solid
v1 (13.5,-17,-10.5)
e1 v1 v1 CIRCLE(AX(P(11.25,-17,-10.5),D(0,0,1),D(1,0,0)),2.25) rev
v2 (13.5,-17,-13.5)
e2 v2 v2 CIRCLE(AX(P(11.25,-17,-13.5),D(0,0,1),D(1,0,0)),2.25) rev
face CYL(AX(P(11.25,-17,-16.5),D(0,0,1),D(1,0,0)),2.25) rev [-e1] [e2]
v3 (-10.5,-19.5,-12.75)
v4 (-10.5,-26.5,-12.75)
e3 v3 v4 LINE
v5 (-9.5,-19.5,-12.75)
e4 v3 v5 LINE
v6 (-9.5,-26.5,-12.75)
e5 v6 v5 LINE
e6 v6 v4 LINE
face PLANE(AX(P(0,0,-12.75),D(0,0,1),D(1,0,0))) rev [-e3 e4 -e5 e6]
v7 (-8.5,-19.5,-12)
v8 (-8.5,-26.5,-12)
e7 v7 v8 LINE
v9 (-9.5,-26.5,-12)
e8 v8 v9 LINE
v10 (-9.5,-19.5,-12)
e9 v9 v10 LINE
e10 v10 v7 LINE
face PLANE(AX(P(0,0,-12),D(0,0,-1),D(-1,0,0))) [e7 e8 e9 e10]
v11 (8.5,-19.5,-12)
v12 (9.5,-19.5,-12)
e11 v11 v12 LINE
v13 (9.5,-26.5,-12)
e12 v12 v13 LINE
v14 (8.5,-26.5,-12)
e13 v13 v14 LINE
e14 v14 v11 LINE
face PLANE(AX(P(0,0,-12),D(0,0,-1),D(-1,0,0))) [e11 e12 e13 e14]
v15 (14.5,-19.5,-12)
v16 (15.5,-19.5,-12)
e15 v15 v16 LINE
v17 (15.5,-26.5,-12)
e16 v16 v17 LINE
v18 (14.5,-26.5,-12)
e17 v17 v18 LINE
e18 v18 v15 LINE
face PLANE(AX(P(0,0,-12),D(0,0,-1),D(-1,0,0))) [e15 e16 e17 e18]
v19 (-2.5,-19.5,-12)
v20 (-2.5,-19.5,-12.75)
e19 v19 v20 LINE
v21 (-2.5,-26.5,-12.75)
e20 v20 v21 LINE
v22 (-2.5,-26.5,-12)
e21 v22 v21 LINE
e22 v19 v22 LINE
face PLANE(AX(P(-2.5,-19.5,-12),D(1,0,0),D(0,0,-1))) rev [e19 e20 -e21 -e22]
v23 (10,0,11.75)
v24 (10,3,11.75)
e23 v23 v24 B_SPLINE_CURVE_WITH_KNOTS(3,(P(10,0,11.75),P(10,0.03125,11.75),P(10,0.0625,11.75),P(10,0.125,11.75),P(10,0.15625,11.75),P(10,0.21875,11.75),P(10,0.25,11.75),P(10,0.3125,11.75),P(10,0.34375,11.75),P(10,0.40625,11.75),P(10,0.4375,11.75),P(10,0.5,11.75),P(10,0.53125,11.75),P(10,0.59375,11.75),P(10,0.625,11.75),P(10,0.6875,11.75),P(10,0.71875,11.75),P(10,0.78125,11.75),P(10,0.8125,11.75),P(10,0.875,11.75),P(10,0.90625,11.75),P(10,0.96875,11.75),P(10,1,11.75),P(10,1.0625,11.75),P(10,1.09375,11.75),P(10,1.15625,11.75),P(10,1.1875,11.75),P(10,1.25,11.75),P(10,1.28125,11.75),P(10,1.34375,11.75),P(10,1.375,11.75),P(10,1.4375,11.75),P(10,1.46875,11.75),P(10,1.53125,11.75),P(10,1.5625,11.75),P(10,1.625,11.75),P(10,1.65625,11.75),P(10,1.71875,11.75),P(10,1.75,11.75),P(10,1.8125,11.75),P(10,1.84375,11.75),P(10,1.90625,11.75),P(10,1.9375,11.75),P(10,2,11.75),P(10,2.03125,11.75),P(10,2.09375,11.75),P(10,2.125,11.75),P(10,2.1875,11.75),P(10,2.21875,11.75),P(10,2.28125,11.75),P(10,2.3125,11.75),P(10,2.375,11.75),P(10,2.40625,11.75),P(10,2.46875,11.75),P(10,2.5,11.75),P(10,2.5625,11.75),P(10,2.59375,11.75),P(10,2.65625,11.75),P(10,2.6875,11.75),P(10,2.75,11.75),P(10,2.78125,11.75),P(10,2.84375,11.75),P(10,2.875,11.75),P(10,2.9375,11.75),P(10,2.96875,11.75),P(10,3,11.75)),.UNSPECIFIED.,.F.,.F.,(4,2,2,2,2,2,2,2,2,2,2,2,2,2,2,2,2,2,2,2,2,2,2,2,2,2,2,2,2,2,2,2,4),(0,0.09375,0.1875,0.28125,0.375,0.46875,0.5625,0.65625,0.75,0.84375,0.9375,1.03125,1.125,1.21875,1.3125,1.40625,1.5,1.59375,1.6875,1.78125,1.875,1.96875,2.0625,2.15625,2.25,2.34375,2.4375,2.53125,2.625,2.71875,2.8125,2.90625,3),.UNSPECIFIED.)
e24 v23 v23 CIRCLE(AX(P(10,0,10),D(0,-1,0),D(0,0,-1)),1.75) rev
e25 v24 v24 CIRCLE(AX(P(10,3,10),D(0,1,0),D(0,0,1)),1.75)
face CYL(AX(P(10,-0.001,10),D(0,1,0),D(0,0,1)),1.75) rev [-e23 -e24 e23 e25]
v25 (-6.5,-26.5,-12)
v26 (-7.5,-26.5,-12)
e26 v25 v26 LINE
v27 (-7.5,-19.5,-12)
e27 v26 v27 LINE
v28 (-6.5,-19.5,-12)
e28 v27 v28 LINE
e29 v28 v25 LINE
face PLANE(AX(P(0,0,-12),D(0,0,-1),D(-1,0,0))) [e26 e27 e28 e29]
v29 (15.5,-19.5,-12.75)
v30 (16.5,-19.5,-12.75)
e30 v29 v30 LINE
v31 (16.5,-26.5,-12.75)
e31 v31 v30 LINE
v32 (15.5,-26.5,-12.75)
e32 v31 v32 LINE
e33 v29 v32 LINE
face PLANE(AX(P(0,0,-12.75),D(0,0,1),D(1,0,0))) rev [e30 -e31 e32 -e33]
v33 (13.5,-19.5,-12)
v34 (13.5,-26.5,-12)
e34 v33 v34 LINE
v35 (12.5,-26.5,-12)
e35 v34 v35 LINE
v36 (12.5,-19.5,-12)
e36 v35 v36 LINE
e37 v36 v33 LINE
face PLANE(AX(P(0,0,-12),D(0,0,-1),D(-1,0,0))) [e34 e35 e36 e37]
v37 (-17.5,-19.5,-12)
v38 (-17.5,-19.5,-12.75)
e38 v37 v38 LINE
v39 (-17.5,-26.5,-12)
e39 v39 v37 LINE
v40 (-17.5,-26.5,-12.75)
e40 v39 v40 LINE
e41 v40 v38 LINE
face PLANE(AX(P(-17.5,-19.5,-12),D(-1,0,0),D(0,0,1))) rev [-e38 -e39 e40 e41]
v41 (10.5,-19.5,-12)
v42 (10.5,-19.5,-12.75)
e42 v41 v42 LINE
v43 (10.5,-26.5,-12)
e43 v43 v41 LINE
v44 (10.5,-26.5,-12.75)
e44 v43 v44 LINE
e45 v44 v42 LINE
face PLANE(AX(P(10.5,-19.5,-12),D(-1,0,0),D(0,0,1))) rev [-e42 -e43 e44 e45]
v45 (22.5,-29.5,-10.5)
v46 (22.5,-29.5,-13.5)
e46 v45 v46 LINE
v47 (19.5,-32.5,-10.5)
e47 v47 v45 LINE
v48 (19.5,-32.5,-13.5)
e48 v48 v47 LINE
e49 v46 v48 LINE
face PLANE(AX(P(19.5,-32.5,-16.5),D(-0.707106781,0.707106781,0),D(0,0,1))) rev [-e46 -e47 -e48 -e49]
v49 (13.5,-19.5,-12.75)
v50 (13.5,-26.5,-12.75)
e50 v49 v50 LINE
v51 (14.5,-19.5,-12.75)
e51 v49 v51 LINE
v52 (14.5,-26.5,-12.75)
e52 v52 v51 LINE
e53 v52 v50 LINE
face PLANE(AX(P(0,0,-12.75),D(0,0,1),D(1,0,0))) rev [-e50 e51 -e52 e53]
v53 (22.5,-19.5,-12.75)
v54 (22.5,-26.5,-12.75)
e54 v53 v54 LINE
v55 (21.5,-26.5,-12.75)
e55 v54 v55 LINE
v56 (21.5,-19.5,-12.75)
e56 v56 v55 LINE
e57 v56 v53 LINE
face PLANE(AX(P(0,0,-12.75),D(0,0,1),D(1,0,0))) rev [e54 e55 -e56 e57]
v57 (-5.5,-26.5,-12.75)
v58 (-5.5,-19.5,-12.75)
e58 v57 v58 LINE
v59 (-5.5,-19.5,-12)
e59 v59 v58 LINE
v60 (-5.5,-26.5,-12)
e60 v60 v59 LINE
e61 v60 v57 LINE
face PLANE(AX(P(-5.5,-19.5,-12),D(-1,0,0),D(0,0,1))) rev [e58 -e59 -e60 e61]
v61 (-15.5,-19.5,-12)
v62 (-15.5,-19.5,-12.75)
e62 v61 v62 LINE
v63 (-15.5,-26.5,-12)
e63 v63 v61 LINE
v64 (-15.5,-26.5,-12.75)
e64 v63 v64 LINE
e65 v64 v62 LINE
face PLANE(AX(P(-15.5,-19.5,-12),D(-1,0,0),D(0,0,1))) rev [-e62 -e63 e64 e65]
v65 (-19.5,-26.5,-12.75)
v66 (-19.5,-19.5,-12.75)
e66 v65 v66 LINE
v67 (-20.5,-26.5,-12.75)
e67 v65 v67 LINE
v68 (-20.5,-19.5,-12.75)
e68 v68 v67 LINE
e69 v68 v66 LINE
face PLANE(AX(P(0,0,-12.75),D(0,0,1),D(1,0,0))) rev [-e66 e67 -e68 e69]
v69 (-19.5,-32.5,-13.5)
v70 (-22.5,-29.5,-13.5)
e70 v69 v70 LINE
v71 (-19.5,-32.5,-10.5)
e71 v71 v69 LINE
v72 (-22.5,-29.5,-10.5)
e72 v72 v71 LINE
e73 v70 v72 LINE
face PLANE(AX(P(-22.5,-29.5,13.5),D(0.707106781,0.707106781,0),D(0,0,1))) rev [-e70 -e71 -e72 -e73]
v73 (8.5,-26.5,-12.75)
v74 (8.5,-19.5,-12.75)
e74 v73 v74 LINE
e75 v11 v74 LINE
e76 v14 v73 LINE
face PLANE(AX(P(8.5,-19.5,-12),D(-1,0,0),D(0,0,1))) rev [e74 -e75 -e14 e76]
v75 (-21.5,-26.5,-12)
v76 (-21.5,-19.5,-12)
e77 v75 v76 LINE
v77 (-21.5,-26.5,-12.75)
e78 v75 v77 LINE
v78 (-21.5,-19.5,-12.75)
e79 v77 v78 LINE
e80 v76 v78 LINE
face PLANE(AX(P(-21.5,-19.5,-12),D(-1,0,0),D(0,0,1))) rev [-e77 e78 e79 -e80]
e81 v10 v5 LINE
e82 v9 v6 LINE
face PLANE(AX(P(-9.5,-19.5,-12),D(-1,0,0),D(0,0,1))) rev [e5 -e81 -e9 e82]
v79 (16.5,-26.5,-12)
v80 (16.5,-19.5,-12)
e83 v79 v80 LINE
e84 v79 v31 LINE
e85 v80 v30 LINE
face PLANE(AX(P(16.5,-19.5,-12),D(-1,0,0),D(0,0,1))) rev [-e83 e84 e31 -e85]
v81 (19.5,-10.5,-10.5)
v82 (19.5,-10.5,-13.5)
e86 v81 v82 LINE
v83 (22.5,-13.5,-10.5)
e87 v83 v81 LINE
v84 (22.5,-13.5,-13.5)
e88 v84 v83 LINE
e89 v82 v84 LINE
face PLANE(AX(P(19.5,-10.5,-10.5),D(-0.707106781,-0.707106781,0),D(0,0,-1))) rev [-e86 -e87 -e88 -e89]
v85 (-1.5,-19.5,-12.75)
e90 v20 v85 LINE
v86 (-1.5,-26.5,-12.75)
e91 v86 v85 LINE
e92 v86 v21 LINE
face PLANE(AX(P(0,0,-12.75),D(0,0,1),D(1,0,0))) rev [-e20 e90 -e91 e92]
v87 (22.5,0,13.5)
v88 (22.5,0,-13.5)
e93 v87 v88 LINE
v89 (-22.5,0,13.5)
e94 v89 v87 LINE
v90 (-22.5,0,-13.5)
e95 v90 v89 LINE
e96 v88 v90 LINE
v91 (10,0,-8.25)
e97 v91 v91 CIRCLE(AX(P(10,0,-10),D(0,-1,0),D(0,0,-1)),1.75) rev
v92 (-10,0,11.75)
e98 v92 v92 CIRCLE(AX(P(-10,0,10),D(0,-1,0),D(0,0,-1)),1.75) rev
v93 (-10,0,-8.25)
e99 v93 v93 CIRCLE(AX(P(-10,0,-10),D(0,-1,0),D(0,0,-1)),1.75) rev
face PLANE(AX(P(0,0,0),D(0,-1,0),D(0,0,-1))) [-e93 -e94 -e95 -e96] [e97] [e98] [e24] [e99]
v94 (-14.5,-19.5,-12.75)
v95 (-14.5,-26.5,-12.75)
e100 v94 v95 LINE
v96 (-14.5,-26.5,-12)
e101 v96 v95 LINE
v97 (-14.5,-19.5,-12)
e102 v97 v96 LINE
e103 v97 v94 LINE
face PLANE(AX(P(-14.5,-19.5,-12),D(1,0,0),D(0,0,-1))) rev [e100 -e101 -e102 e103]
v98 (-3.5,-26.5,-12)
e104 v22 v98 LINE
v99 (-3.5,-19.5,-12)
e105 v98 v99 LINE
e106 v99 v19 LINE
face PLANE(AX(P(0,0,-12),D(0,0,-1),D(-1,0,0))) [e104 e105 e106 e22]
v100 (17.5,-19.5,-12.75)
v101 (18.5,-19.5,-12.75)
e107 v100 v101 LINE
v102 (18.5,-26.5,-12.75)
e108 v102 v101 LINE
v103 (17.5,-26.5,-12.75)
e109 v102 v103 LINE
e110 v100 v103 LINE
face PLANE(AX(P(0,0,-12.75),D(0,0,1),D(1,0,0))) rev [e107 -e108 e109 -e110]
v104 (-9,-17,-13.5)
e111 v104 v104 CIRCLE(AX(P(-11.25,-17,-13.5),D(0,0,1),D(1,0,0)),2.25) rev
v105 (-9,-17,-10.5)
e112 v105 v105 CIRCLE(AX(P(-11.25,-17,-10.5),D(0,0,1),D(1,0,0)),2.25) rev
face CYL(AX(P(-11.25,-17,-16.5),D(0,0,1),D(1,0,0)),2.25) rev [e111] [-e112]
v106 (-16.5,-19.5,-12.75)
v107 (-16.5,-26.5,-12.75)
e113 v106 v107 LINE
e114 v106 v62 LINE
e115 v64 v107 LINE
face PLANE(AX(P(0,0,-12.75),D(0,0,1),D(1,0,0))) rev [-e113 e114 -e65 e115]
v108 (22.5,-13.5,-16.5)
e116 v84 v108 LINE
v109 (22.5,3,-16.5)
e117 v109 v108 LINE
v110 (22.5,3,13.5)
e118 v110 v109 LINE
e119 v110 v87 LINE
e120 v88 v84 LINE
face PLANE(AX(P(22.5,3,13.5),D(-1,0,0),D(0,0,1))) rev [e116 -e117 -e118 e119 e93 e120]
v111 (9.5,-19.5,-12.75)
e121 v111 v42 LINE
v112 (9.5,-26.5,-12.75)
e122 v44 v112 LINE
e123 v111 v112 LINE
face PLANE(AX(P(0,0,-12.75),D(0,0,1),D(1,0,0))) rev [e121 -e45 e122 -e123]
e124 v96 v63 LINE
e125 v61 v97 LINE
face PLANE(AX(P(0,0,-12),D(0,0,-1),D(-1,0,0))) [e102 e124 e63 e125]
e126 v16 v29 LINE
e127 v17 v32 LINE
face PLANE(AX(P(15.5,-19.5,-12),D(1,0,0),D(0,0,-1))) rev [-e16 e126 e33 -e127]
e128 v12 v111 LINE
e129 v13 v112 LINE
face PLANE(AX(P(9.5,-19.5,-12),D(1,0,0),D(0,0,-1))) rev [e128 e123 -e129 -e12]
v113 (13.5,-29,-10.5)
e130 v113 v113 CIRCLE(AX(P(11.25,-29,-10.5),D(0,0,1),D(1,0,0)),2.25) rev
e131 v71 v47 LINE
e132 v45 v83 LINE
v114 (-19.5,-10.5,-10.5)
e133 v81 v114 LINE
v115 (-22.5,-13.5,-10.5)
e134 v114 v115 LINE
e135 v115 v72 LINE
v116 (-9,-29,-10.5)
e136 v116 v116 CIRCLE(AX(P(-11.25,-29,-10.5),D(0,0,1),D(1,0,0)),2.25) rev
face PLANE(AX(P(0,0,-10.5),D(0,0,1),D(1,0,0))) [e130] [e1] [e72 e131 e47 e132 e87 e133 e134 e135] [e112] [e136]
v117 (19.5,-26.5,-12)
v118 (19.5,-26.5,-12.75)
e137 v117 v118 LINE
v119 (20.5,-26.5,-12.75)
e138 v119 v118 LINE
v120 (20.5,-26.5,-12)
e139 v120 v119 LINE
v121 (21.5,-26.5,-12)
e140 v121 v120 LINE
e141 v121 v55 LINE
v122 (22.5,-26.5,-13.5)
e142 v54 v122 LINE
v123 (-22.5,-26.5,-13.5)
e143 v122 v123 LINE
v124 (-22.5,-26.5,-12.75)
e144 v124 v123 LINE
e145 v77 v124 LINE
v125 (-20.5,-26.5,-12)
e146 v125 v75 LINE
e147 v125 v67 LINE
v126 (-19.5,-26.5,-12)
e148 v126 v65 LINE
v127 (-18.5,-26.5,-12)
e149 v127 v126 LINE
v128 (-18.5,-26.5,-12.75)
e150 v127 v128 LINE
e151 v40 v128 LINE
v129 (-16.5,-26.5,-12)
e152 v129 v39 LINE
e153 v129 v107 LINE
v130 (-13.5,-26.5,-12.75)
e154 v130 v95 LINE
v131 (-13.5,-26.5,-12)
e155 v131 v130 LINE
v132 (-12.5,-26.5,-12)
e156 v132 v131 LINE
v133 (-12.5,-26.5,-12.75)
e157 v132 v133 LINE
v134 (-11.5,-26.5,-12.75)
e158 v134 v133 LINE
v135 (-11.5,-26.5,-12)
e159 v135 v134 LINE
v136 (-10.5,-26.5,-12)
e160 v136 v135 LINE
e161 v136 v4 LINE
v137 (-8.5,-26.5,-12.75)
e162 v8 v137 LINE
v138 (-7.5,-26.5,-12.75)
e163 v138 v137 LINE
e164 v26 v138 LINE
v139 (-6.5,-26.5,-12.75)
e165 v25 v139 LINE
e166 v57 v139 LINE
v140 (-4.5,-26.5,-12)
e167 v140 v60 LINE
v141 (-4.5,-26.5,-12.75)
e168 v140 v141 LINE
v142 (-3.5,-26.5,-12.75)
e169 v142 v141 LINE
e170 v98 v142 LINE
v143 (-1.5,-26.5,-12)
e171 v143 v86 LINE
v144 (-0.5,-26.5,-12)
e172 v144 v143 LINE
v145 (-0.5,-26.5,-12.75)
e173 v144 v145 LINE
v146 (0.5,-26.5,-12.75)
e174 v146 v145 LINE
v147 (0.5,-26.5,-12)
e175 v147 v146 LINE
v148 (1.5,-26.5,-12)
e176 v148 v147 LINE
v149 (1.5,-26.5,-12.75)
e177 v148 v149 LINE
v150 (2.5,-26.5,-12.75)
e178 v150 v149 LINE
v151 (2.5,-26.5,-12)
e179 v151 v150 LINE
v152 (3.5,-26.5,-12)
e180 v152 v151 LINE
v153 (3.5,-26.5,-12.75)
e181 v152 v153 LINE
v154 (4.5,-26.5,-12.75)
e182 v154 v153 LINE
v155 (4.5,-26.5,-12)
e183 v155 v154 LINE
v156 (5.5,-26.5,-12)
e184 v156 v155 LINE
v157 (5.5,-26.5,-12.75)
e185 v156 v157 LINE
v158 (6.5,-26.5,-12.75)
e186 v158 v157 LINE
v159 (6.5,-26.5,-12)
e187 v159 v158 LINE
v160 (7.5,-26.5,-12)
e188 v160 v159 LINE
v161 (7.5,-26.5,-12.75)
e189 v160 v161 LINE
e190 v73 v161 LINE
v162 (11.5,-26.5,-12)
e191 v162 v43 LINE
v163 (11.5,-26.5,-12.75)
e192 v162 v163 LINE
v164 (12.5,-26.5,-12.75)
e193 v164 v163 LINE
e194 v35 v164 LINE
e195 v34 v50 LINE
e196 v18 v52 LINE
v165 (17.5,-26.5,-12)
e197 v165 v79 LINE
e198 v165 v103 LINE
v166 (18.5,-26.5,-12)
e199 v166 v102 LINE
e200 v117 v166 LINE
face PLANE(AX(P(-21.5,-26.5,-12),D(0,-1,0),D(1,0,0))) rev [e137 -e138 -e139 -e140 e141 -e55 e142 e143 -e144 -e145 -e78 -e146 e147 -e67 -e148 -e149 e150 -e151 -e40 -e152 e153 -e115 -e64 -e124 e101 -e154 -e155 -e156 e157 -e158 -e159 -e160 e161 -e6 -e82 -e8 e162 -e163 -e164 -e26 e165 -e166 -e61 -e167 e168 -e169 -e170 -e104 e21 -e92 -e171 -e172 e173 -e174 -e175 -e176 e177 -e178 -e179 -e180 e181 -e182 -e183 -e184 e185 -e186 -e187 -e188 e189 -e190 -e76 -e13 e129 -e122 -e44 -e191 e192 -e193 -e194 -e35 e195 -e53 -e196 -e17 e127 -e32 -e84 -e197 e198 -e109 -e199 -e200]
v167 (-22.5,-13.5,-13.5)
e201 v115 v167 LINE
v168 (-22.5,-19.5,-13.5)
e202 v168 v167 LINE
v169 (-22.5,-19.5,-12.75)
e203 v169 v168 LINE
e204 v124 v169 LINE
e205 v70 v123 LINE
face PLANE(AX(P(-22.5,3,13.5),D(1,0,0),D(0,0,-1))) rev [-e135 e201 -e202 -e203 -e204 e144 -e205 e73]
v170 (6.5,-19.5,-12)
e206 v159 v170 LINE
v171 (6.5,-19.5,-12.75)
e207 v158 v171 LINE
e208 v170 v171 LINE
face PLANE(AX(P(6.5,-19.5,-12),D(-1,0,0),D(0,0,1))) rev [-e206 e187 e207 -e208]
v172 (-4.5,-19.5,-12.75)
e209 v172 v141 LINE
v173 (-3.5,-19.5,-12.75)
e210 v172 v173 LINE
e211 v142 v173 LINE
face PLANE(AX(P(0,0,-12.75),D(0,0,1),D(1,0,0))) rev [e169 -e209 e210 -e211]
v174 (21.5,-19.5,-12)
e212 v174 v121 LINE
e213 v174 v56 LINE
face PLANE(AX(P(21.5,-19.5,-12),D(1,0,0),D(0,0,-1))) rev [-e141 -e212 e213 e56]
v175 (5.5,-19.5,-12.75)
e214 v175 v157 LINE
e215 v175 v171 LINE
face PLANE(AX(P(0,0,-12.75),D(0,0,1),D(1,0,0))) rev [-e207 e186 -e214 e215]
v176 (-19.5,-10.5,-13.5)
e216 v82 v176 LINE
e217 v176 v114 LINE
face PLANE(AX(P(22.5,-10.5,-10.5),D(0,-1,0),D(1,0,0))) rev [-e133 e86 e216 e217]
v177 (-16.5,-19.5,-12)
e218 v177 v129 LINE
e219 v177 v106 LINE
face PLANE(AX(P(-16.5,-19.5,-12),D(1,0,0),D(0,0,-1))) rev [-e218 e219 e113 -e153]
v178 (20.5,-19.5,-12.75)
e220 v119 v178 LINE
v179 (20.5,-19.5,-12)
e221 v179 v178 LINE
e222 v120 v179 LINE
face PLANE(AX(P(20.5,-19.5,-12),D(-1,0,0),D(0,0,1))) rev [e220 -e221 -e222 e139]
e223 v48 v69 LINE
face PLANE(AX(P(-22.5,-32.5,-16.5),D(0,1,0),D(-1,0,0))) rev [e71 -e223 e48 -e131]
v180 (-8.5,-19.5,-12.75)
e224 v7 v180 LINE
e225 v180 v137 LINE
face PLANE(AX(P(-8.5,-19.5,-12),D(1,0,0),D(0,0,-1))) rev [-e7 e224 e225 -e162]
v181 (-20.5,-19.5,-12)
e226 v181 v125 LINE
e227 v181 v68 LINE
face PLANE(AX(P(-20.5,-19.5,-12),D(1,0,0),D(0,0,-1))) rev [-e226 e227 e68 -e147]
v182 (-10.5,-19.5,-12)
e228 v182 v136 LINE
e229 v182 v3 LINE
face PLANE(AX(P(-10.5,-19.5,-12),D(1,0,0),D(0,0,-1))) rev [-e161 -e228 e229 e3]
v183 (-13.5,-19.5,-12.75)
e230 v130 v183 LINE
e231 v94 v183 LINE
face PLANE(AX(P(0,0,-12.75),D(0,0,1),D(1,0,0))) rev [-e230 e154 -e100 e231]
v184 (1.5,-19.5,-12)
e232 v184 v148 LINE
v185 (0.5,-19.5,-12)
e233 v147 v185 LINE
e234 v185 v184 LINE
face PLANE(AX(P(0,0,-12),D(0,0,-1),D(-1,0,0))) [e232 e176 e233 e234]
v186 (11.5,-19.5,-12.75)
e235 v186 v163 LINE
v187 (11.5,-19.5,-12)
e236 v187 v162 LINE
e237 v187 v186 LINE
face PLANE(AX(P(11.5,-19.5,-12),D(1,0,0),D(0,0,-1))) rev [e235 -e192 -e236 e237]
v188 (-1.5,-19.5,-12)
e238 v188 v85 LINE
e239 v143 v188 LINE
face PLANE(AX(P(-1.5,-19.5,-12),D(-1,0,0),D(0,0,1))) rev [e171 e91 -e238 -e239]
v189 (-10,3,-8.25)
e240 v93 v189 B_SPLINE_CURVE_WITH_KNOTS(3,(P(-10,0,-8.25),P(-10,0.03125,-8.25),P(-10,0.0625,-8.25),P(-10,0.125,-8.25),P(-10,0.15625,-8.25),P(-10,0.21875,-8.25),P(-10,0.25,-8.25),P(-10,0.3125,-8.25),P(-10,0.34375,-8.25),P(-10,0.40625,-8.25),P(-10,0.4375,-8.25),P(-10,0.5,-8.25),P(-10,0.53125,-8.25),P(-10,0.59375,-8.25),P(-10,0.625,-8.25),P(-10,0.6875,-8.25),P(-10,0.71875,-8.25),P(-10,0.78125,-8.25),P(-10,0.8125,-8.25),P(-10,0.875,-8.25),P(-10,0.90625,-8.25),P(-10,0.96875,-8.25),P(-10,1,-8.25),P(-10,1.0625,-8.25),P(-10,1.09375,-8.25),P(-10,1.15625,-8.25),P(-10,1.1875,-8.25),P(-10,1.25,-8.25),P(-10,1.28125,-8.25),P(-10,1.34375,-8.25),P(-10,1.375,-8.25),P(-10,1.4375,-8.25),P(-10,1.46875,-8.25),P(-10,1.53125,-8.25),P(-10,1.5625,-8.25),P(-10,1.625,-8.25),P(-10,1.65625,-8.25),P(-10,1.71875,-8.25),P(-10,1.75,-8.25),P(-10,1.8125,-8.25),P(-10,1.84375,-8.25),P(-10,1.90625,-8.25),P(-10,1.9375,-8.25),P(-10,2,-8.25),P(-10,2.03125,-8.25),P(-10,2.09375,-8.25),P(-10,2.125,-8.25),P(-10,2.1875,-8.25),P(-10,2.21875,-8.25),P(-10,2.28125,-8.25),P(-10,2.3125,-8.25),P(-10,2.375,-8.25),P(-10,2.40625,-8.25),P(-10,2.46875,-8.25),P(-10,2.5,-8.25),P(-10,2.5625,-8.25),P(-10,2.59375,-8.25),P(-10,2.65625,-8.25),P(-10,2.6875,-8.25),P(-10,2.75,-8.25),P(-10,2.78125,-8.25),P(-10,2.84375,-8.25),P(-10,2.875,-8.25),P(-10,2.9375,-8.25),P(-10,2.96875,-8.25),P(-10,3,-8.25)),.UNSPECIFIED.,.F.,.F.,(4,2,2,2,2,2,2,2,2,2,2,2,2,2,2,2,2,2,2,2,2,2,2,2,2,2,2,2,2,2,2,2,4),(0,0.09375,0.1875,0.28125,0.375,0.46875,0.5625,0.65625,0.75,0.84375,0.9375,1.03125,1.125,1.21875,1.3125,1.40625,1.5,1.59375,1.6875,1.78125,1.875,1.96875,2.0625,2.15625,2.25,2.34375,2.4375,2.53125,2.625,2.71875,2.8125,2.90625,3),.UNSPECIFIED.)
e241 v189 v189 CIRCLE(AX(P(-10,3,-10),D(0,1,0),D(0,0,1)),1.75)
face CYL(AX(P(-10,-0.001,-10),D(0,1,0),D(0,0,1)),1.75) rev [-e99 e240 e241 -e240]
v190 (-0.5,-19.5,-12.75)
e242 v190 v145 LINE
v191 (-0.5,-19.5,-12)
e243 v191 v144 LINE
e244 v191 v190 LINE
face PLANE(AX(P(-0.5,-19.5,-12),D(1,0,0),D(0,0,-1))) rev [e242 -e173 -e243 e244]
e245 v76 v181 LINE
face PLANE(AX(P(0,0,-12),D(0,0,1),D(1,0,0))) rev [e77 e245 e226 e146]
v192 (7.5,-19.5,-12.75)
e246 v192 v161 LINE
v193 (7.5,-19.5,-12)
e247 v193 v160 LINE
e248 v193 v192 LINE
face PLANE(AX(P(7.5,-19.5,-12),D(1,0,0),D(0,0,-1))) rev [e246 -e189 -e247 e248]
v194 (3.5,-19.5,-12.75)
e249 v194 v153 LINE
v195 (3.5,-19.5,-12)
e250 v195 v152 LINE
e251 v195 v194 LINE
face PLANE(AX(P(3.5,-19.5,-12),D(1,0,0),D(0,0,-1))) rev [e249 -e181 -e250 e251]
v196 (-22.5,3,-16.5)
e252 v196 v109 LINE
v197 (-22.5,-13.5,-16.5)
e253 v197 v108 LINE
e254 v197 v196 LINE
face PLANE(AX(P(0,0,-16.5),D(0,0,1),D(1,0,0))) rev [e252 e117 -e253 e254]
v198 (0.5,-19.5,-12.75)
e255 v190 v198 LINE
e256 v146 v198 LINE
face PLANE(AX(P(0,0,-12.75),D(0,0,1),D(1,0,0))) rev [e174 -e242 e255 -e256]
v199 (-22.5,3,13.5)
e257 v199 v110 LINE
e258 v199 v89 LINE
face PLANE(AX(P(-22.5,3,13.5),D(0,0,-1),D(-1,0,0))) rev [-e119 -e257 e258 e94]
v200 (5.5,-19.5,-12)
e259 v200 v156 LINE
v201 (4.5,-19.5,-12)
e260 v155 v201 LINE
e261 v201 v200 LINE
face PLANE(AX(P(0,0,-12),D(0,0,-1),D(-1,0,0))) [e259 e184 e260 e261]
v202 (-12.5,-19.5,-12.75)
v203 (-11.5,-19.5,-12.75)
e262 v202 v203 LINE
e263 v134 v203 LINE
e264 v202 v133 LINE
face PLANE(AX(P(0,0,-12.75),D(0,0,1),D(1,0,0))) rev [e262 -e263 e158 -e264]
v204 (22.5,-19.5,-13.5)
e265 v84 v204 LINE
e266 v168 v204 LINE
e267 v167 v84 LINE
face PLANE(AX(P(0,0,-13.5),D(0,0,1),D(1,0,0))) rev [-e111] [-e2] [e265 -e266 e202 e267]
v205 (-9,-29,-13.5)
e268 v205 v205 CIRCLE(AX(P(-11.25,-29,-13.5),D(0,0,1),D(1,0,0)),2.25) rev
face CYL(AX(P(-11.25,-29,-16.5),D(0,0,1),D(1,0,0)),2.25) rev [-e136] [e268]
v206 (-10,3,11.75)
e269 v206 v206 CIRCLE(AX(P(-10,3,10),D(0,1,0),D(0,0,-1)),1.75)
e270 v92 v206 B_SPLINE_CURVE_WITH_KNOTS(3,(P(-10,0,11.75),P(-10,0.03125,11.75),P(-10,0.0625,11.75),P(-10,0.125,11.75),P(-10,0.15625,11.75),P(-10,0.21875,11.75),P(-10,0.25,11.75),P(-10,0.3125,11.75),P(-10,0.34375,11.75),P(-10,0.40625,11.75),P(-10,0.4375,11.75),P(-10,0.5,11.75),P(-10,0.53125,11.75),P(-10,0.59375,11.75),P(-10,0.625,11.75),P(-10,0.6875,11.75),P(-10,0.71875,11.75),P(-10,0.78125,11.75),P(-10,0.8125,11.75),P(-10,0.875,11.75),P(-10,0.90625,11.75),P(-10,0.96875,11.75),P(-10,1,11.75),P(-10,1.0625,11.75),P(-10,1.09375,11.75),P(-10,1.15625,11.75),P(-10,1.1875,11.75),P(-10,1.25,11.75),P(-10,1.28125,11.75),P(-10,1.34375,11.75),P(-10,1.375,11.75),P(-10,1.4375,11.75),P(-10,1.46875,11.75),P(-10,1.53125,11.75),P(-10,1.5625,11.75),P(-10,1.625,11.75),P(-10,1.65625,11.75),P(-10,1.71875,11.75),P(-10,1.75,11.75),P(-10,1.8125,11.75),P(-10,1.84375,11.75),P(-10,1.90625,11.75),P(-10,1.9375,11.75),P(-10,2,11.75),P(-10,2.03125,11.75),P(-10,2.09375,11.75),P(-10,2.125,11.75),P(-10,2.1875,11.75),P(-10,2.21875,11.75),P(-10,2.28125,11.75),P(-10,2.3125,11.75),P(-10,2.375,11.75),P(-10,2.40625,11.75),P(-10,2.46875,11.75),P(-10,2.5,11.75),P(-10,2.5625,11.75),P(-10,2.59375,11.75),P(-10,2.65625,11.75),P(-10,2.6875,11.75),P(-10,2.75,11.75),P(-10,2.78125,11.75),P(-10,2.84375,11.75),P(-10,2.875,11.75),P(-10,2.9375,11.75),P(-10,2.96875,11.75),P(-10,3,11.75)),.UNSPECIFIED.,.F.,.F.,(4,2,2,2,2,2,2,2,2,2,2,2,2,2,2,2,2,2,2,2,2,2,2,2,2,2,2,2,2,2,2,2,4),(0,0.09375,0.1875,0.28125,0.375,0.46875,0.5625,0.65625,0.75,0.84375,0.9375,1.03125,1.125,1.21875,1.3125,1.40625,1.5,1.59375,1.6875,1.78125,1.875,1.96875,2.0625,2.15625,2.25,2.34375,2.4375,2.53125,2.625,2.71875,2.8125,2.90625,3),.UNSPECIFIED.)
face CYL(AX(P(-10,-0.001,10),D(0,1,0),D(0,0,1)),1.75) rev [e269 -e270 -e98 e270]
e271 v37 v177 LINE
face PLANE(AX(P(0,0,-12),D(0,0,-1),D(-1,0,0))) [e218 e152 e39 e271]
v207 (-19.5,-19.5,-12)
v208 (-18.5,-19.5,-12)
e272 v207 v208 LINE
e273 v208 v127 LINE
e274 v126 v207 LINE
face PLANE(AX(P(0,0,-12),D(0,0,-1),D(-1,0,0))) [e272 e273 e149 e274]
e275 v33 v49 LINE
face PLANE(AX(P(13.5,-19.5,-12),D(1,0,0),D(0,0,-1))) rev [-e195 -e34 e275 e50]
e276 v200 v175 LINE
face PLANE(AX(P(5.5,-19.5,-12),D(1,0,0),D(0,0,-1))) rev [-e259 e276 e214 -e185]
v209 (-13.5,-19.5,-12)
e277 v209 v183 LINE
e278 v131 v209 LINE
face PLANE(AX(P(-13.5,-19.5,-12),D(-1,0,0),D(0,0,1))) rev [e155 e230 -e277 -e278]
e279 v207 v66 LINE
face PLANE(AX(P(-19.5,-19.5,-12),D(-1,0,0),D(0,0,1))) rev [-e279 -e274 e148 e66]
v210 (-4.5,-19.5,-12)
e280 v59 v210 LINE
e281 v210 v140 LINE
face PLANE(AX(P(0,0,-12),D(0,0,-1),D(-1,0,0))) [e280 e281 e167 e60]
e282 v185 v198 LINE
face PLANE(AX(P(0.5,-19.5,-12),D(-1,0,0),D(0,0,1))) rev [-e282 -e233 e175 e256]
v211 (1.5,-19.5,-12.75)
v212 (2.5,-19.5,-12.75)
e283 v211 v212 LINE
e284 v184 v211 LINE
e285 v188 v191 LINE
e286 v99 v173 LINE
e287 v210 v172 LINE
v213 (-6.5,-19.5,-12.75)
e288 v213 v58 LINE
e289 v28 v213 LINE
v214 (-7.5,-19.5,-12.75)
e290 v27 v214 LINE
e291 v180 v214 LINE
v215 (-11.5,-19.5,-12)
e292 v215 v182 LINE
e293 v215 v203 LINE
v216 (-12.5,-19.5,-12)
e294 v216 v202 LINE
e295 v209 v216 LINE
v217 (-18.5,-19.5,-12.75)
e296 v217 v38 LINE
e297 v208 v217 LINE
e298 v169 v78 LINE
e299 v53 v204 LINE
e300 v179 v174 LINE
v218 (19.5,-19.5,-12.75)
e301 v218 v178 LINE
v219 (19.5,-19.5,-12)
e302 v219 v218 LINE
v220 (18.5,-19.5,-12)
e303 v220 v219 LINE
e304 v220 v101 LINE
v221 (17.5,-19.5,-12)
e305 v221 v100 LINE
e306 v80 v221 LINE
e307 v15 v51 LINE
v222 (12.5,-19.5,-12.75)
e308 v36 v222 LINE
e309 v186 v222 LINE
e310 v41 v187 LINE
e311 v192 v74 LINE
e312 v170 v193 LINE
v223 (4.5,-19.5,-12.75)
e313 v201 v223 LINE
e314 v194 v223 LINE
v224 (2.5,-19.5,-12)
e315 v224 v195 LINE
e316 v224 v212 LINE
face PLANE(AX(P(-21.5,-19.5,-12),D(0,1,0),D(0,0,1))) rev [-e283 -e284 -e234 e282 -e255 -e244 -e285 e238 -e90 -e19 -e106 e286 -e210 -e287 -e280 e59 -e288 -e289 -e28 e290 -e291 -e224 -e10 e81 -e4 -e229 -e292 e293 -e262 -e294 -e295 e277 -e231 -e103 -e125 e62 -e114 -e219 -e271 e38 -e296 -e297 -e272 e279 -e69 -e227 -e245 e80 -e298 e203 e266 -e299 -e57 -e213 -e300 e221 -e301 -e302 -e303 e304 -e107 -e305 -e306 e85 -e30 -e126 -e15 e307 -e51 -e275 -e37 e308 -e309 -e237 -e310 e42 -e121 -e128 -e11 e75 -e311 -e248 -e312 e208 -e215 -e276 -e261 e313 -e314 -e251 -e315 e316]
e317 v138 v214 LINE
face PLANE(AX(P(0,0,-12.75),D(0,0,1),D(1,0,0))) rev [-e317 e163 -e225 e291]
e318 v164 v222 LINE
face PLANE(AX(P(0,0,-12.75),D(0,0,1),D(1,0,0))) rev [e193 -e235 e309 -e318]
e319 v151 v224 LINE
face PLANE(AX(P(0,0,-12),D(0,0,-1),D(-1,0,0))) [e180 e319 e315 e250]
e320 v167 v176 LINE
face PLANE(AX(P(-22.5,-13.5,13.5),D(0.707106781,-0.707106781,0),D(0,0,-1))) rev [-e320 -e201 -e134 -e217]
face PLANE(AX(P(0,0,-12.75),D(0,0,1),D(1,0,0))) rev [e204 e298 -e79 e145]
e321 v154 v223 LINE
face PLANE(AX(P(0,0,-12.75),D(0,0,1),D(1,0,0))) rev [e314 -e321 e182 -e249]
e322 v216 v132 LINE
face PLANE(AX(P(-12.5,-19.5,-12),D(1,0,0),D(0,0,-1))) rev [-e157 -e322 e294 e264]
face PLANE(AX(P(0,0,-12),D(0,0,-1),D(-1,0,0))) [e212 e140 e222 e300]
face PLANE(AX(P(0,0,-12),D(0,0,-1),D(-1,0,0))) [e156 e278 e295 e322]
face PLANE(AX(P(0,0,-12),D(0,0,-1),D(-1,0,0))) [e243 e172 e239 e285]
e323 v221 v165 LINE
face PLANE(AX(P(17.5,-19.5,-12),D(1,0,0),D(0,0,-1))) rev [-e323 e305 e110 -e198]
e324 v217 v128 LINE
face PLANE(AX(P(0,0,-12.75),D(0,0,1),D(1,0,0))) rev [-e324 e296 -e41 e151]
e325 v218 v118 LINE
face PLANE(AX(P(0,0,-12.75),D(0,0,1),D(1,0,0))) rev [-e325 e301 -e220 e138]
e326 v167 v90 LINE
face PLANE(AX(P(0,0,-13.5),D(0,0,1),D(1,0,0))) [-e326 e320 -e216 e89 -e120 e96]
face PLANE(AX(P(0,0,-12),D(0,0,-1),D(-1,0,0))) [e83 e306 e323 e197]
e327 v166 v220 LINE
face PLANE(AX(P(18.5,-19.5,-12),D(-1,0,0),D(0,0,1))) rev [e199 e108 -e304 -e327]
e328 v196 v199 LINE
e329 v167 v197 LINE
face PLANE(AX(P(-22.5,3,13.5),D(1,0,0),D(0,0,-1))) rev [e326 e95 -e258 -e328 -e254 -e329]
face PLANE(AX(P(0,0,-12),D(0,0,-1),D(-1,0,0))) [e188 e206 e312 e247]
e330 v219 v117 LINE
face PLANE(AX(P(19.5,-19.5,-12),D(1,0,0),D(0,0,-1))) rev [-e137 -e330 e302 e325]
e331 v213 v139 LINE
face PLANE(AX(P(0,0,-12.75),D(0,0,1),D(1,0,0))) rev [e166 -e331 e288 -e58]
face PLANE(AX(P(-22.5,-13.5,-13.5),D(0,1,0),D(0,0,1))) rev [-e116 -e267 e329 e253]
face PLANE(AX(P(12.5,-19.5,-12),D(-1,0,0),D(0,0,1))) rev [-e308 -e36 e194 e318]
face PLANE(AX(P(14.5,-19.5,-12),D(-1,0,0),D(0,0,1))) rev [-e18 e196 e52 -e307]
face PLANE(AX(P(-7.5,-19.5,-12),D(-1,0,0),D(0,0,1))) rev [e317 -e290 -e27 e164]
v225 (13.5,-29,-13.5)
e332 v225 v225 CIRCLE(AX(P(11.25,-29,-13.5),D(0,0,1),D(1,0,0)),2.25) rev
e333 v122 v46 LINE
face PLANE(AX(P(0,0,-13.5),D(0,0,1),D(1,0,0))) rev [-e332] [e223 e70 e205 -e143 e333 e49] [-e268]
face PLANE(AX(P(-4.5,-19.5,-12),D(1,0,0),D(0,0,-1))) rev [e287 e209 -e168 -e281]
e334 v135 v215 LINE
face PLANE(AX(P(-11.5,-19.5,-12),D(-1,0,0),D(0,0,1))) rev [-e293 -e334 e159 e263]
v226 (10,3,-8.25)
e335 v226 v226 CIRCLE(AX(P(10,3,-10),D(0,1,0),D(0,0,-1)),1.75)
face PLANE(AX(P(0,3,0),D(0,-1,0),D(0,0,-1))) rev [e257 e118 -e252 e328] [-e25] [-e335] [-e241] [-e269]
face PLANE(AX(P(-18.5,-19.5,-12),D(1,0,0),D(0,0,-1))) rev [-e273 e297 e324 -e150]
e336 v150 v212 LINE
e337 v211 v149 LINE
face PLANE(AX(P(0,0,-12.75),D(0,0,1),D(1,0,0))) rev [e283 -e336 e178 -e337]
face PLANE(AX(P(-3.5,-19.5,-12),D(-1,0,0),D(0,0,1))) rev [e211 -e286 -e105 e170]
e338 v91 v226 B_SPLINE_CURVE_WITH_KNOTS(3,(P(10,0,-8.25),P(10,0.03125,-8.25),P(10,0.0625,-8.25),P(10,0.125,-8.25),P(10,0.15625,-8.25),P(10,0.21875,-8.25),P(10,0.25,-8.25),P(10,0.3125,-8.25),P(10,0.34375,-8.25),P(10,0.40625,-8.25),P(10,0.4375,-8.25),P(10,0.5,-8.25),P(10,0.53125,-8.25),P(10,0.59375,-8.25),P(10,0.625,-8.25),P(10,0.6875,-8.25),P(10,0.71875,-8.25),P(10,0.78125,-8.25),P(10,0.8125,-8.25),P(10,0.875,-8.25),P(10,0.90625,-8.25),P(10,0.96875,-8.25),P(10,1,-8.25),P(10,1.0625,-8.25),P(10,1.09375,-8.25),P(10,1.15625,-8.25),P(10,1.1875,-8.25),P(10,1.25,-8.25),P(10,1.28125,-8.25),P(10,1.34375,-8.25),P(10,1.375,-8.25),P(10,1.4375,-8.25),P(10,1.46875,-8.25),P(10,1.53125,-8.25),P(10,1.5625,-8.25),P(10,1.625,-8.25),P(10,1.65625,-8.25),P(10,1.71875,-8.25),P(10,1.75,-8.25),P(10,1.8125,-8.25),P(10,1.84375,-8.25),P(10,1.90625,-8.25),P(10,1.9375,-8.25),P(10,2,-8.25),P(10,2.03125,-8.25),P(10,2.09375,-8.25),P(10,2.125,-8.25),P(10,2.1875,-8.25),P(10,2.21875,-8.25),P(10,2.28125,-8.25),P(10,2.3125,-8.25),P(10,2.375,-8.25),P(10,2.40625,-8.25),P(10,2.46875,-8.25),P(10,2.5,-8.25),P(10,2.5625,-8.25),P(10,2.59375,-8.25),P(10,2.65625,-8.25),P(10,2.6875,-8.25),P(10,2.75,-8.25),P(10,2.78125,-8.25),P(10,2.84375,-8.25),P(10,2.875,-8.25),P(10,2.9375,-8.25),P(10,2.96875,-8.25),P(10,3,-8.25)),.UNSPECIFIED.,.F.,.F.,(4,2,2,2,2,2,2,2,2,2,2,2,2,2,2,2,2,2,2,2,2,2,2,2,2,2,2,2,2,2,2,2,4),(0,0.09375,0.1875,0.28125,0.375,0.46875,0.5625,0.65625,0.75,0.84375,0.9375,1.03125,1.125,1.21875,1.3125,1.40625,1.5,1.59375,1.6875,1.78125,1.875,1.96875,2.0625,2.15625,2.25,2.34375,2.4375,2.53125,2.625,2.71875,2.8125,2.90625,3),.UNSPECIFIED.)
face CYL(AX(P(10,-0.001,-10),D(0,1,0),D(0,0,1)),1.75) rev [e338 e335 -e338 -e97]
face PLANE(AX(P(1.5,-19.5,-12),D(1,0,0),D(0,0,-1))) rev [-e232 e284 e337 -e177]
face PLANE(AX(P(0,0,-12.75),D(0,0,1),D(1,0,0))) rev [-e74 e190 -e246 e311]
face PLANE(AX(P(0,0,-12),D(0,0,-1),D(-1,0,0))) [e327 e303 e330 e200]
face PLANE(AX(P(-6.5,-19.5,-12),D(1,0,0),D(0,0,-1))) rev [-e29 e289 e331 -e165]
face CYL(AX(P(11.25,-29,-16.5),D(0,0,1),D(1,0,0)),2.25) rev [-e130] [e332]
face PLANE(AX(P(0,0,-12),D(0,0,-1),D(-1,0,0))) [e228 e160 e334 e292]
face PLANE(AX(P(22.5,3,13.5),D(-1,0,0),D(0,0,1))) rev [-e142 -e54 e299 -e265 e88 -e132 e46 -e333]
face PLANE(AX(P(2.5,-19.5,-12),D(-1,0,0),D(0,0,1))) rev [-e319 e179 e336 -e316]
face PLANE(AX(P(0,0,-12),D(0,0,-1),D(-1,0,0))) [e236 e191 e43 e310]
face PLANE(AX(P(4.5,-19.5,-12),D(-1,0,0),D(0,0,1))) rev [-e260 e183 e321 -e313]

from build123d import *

# Parameters (mm, degrees)
SKETCH1_W                      = 45
SKETCH1_H                      = 27
BOSS_EXTRUDE1_DEPTH            = 3
CUT_EXTRUDE1_REACH             = 28.41
SKETCH2_R                      = 1.75
SKETCH3_W                      = 45
SKETCH3_H                      = 35.5
BOSS_EXTRUDE2_DEPTH            = 3
SKETCH4_W                      = 45
SKETCH4_H                      = 22
BOSS_EXTRUDE3_DEPTH            = 3
SKETCH6_W                      = 45
SKETCH6_H                      = 19
CUT_EXTRUDE2_DEPTH             = 3
SKETCH7_W                      = 1
SKETCH7_H                      = 7
CUT_EXTRUDE3_DEPTH             = 1.5
SKETCH8_W                      = 45
SKETCH8_H                      = 7
CUT_EXTRUDE4_DEPTH             = 0.75
CUT_EXTRUDE5_REACH             = 49.87
SKETCH10_R                     = 2.25
CUT_EXTRUDE5_DIRECTION_2_DEPTH = 48.86961458
CHAMFER1_SIZE                  = 3


with BuildPart() as part:
    # Sketch1 → Boss-Extrude1 (new body)
    with BuildSketch(Plane(origin=(0, 0, 0), x_dir=(1, 0, 0), z_dir=(0, 1, 0))):
        Rectangle(SKETCH1_W, SKETCH1_H)
    extrude(amount=BOSS_EXTRUDE1_DEPTH)

    # Sketch2 → Cut-Extrude1 (cut, up to next)
    with BuildSketch(Plane(origin=(0, 3, 0), x_dir=(1, 0, 0), z_dir=(0, 1, 0)), mode=Mode.PRIVATE) as cut_extrude1_sk1:
        with Locations(Location((-10, 10, 0), (0, 0, 270))):
            Circle(SKETCH2_R)
    cut_extrude1_tool1 = extrude(cut_extrude1_sk1.sketch, amount=-CUT_EXTRUDE1_REACH, mode=Mode.PRIVATE) & part.part
    # Sketch2 → Cut-Extrude1 (cut, up to next)
    with BuildSketch(Plane(origin=(0, 3, 0), x_dir=(1, 0, 0), z_dir=(0, 1, 0)), mode=Mode.PRIVATE) as cut_extrude1_sk2:
        with Locations(Location((10, 10, 0), (0, 0, 270))):
            Circle(SKETCH2_R)
    cut_extrude1_tool2 = extrude(cut_extrude1_sk2.sketch, amount=-CUT_EXTRUDE1_REACH, mode=Mode.PRIVATE) & part.part
    # Sketch2 → Cut-Extrude1 (cut, up to next)
    with BuildSketch(Plane(origin=(0, 3, 0), x_dir=(1, 0, 0), z_dir=(0, 1, 0)), mode=Mode.PRIVATE) as cut_extrude1_sk3:
        with Locations(Location((10, -10, 0), (0, 0, 270))):
            Circle(SKETCH2_R)
    cut_extrude1_tool3 = extrude(cut_extrude1_sk3.sketch, amount=-CUT_EXTRUDE1_REACH, mode=Mode.PRIVATE) & part.part
    # Sketch2 → Cut-Extrude1 (cut, up to next)
    with BuildSketch(Plane(origin=(0, 3, 0), x_dir=(1, 0, 0), z_dir=(0, 1, 0)), mode=Mode.PRIVATE) as cut_extrude1_sk4:
        with Locations(Location((-10, -10, 0), (0, 0, 270))):
            Circle(SKETCH2_R)
    cut_extrude1_tool4 = extrude(cut_extrude1_sk4.sketch, amount=-CUT_EXTRUDE1_REACH, mode=Mode.PRIVATE) & part.part
    add(cut_extrude1_tool1.solids().sort_by_distance((-10, 3, -10))[0], mode=Mode.SUBTRACT)
    add(cut_extrude1_tool2.solids().sort_by_distance((10, 3, -10))[0], mode=Mode.SUBTRACT)
    add(cut_extrude1_tool3.solids().sort_by_distance((10, 3, 10))[0], mode=Mode.SUBTRACT)
    add(cut_extrude1_tool4.solids().sort_by_distance((-10, 3, 10))[0], mode=Mode.SUBTRACT)

    # Sketch3 → Boss-Extrude2 (add)
    with BuildSketch(Plane(origin=(0, 0, -13.5), x_dir=(-1, 0, 0), z_dir=(0, 0, -1))):
        with Locations((0, -14.75)):
            Rectangle(SKETCH3_W, SKETCH3_H)
    extrude(amount=BOSS_EXTRUDE2_DEPTH)

    # Sketch4 → Boss-Extrude3 (add)
    with BuildSketch(Plane.XY.offset(-13.5)):
        with Locations((0, -21.5)):
            Rectangle(SKETCH4_W, SKETCH4_H)
    extrude(amount=BOSS_EXTRUDE3_DEPTH)

    # Sketch6 → Cut-Extrude2 (cut)
    with BuildSketch(Plane(origin=(0, 0, -16.5), x_dir=(-1, 0, 0), z_dir=(0, 0, -1))):
        with Locations((0, -23)):
            Rectangle(SKETCH6_W, SKETCH6_H)
    extrude(amount=-CUT_EXTRUDE2_DEPTH, mode=Mode.SUBTRACT)

    # Sketch7 → Cut-Extrude3 (cut)
    with BuildSketch(Plane(origin=(0, 0, -13.5), x_dir=(-1, 0, 0), z_dir=(0, 0, -1))):
        with Locations((19, -23)):
            Rectangle(SKETCH7_W, SKETCH7_H)
        with Locations((21, -23)):
            Rectangle(SKETCH7_W, SKETCH7_H)
        with Locations((17, -23)):
            Rectangle(SKETCH7_W, SKETCH7_H)
        with Locations((15, -23)):
            Rectangle(SKETCH7_W, SKETCH7_H)
        with Locations((13, -23)):
            Rectangle(SKETCH7_W, SKETCH7_H)
        with Locations((11, -23)):
            Rectangle(SKETCH7_W, SKETCH7_H)
        with Locations((9, -23)):
            Rectangle(SKETCH7_W, SKETCH7_H)
        with Locations((7, -23)):
            Rectangle(SKETCH7_W, SKETCH7_H)
        with Locations((5, -23)):
            Rectangle(SKETCH7_W, SKETCH7_H)
        with Locations((3, -23)):
            Rectangle(SKETCH7_W, SKETCH7_H)
        with Locations((1, -23)):
            Rectangle(SKETCH7_W, SKETCH7_H)
        with Locations((-1, -23)):
            Rectangle(SKETCH7_W, SKETCH7_H)
        with Locations((-3, -23)):
            Rectangle(SKETCH7_W, SKETCH7_H)
        with Locations((-5, -23)):
            Rectangle(SKETCH7_W, SKETCH7_H)
        with Locations((-7, -23)):
            Rectangle(SKETCH7_W, SKETCH7_H)
        with Locations((-9, -23)):
            Rectangle(SKETCH7_W, SKETCH7_H)
        with Locations((-11, -23)):
            Rectangle(SKETCH7_W, SKETCH7_H)
        with Locations((-13, -23)):
            Rectangle(SKETCH7_W, SKETCH7_H)
        with Locations((-15, -23)):
            Rectangle(SKETCH7_W, SKETCH7_H)
        with Locations((-17, -23)):
            Rectangle(SKETCH7_W, SKETCH7_H)
        with Locations((-19, -23)):
            Rectangle(SKETCH7_W, SKETCH7_H)
        with Locations((-21, -23)):
            Rectangle(SKETCH7_W, SKETCH7_H)
    extrude(amount=-CUT_EXTRUDE3_DEPTH, mode=Mode.SUBTRACT)

    # Sketch8 → Cut-Extrude4 (cut)
    with BuildSketch(Plane(origin=(0, 0, -13.5), x_dir=(-1, 0, 0), z_dir=(0, 0, -1))):
        with Locations((0, -23)):
            Rectangle(SKETCH8_W, SKETCH8_H)
    extrude(amount=-CUT_EXTRUDE4_DEPTH, mode=Mode.SUBTRACT)

    # Sketch10 → Cut-Extrude5 (cut, up to next)
    with BuildSketch(Plane(origin=(0, 0, -13.5), x_dir=(-1, 0, 0), z_dir=(0, 0, -1)), mode=Mode.PRIVATE) as cut_extrude5_sk1:
        with Locations(Location((11.25, -29, 0), (0, 0, 180))):
            Circle(SKETCH10_R)
    cut_extrude5_tool1 = extrude(cut_extrude5_sk1.sketch, amount=-CUT_EXTRUDE5_REACH, mode=Mode.PRIVATE) & part.part
    # Sketch10 → Cut-Extrude5 (cut, up to next)
    with BuildSketch(Plane(origin=(0, 0, -13.5), x_dir=(-1, 0, 0), z_dir=(0, 0, -1)), mode=Mode.PRIVATE) as cut_extrude5_sk2:
        with Locations(Location((11.25, -17, 0), (0, 0, 180))):
            Circle(SKETCH10_R)
    cut_extrude5_tool2 = extrude(cut_extrude5_sk2.sketch, amount=-CUT_EXTRUDE5_REACH, mode=Mode.PRIVATE) & part.part
    # Sketch10 → Cut-Extrude5 (cut, up to next)
    with BuildSketch(Plane(origin=(0, 0, -13.5), x_dir=(-1, 0, 0), z_dir=(0, 0, -1)), mode=Mode.PRIVATE) as cut_extrude5_sk3:
        with Locations(Location((-11.25, -17, 0), (0, 0, 180))):
            Circle(SKETCH10_R)
    cut_extrude5_tool3 = extrude(cut_extrude5_sk3.sketch, amount=-CUT_EXTRUDE5_REACH, mode=Mode.PRIVATE) & part.part
    # Sketch10 → Cut-Extrude5 (cut, up to next)
    with BuildSketch(Plane(origin=(0, 0, -13.5), x_dir=(-1, 0, 0), z_dir=(0, 0, -1)), mode=Mode.PRIVATE) as cut_extrude5_sk4:
        with Locations(Location((-11.25, -29, 0), (0, 0, 180))):
            Circle(SKETCH10_R)
    cut_extrude5_tool4 = extrude(cut_extrude5_sk4.sketch, amount=-CUT_EXTRUDE5_REACH, mode=Mode.PRIVATE) & part.part
    add(cut_extrude5_tool1.solids().sort_by_distance((-11.25, -29, -13.5))[0], mode=Mode.SUBTRACT)
    add(cut_extrude5_tool2.solids().sort_by_distance((-11.25, -17, -13.5))[0], mode=Mode.SUBTRACT)
    add(cut_extrude5_tool3.solids().sort_by_distance((11.25, -17, -13.5))[0], mode=Mode.SUBTRACT)
    add(cut_extrude5_tool4.solids().sort_by_distance((11.25, -29, -13.5))[0], mode=Mode.SUBTRACT)

    # Sketch10 → Cut-Extrude5 direction 2 (cut)
    with BuildSketch(Plane(origin=(0, 0, -13.5), x_dir=(-1, 0, 0), z_dir=(0, 0, -1))):
        with Locations(Location((11.25, -29, 0), (0, 0, 180))):
            Circle(SKETCH10_R)
        with Locations(Location((11.25, -17, 0), (0, 0, 180))):
            Circle(SKETCH10_R)
        with Locations(Location((-11.25, -17, 0), (0, 0, 180))):
            Circle(SKETCH10_R)
        with Locations(Location((-11.25, -29, 0), (0, 0, 180))):
            Circle(SKETCH10_R)
    extrude(amount=CUT_EXTRUDE5_DIRECTION_2_DEPTH, mode=Mode.SUBTRACT)

    # Chamfer1
    chamfer1_edges = [part.edges().sort_by_distance(p)[0] for p in [
        (22.5, -10.5, -12),
        (-22.5, -10.5, -12),
        (22.5, -32.5, -12),
        (-22.5, -32.5, -12),
    ]]
    chamfer(chamfer1_edges, length=CHAMFER1_SIZE - 0.0001)  # a hair under: the kernel refuses the full size


solid = part.part
